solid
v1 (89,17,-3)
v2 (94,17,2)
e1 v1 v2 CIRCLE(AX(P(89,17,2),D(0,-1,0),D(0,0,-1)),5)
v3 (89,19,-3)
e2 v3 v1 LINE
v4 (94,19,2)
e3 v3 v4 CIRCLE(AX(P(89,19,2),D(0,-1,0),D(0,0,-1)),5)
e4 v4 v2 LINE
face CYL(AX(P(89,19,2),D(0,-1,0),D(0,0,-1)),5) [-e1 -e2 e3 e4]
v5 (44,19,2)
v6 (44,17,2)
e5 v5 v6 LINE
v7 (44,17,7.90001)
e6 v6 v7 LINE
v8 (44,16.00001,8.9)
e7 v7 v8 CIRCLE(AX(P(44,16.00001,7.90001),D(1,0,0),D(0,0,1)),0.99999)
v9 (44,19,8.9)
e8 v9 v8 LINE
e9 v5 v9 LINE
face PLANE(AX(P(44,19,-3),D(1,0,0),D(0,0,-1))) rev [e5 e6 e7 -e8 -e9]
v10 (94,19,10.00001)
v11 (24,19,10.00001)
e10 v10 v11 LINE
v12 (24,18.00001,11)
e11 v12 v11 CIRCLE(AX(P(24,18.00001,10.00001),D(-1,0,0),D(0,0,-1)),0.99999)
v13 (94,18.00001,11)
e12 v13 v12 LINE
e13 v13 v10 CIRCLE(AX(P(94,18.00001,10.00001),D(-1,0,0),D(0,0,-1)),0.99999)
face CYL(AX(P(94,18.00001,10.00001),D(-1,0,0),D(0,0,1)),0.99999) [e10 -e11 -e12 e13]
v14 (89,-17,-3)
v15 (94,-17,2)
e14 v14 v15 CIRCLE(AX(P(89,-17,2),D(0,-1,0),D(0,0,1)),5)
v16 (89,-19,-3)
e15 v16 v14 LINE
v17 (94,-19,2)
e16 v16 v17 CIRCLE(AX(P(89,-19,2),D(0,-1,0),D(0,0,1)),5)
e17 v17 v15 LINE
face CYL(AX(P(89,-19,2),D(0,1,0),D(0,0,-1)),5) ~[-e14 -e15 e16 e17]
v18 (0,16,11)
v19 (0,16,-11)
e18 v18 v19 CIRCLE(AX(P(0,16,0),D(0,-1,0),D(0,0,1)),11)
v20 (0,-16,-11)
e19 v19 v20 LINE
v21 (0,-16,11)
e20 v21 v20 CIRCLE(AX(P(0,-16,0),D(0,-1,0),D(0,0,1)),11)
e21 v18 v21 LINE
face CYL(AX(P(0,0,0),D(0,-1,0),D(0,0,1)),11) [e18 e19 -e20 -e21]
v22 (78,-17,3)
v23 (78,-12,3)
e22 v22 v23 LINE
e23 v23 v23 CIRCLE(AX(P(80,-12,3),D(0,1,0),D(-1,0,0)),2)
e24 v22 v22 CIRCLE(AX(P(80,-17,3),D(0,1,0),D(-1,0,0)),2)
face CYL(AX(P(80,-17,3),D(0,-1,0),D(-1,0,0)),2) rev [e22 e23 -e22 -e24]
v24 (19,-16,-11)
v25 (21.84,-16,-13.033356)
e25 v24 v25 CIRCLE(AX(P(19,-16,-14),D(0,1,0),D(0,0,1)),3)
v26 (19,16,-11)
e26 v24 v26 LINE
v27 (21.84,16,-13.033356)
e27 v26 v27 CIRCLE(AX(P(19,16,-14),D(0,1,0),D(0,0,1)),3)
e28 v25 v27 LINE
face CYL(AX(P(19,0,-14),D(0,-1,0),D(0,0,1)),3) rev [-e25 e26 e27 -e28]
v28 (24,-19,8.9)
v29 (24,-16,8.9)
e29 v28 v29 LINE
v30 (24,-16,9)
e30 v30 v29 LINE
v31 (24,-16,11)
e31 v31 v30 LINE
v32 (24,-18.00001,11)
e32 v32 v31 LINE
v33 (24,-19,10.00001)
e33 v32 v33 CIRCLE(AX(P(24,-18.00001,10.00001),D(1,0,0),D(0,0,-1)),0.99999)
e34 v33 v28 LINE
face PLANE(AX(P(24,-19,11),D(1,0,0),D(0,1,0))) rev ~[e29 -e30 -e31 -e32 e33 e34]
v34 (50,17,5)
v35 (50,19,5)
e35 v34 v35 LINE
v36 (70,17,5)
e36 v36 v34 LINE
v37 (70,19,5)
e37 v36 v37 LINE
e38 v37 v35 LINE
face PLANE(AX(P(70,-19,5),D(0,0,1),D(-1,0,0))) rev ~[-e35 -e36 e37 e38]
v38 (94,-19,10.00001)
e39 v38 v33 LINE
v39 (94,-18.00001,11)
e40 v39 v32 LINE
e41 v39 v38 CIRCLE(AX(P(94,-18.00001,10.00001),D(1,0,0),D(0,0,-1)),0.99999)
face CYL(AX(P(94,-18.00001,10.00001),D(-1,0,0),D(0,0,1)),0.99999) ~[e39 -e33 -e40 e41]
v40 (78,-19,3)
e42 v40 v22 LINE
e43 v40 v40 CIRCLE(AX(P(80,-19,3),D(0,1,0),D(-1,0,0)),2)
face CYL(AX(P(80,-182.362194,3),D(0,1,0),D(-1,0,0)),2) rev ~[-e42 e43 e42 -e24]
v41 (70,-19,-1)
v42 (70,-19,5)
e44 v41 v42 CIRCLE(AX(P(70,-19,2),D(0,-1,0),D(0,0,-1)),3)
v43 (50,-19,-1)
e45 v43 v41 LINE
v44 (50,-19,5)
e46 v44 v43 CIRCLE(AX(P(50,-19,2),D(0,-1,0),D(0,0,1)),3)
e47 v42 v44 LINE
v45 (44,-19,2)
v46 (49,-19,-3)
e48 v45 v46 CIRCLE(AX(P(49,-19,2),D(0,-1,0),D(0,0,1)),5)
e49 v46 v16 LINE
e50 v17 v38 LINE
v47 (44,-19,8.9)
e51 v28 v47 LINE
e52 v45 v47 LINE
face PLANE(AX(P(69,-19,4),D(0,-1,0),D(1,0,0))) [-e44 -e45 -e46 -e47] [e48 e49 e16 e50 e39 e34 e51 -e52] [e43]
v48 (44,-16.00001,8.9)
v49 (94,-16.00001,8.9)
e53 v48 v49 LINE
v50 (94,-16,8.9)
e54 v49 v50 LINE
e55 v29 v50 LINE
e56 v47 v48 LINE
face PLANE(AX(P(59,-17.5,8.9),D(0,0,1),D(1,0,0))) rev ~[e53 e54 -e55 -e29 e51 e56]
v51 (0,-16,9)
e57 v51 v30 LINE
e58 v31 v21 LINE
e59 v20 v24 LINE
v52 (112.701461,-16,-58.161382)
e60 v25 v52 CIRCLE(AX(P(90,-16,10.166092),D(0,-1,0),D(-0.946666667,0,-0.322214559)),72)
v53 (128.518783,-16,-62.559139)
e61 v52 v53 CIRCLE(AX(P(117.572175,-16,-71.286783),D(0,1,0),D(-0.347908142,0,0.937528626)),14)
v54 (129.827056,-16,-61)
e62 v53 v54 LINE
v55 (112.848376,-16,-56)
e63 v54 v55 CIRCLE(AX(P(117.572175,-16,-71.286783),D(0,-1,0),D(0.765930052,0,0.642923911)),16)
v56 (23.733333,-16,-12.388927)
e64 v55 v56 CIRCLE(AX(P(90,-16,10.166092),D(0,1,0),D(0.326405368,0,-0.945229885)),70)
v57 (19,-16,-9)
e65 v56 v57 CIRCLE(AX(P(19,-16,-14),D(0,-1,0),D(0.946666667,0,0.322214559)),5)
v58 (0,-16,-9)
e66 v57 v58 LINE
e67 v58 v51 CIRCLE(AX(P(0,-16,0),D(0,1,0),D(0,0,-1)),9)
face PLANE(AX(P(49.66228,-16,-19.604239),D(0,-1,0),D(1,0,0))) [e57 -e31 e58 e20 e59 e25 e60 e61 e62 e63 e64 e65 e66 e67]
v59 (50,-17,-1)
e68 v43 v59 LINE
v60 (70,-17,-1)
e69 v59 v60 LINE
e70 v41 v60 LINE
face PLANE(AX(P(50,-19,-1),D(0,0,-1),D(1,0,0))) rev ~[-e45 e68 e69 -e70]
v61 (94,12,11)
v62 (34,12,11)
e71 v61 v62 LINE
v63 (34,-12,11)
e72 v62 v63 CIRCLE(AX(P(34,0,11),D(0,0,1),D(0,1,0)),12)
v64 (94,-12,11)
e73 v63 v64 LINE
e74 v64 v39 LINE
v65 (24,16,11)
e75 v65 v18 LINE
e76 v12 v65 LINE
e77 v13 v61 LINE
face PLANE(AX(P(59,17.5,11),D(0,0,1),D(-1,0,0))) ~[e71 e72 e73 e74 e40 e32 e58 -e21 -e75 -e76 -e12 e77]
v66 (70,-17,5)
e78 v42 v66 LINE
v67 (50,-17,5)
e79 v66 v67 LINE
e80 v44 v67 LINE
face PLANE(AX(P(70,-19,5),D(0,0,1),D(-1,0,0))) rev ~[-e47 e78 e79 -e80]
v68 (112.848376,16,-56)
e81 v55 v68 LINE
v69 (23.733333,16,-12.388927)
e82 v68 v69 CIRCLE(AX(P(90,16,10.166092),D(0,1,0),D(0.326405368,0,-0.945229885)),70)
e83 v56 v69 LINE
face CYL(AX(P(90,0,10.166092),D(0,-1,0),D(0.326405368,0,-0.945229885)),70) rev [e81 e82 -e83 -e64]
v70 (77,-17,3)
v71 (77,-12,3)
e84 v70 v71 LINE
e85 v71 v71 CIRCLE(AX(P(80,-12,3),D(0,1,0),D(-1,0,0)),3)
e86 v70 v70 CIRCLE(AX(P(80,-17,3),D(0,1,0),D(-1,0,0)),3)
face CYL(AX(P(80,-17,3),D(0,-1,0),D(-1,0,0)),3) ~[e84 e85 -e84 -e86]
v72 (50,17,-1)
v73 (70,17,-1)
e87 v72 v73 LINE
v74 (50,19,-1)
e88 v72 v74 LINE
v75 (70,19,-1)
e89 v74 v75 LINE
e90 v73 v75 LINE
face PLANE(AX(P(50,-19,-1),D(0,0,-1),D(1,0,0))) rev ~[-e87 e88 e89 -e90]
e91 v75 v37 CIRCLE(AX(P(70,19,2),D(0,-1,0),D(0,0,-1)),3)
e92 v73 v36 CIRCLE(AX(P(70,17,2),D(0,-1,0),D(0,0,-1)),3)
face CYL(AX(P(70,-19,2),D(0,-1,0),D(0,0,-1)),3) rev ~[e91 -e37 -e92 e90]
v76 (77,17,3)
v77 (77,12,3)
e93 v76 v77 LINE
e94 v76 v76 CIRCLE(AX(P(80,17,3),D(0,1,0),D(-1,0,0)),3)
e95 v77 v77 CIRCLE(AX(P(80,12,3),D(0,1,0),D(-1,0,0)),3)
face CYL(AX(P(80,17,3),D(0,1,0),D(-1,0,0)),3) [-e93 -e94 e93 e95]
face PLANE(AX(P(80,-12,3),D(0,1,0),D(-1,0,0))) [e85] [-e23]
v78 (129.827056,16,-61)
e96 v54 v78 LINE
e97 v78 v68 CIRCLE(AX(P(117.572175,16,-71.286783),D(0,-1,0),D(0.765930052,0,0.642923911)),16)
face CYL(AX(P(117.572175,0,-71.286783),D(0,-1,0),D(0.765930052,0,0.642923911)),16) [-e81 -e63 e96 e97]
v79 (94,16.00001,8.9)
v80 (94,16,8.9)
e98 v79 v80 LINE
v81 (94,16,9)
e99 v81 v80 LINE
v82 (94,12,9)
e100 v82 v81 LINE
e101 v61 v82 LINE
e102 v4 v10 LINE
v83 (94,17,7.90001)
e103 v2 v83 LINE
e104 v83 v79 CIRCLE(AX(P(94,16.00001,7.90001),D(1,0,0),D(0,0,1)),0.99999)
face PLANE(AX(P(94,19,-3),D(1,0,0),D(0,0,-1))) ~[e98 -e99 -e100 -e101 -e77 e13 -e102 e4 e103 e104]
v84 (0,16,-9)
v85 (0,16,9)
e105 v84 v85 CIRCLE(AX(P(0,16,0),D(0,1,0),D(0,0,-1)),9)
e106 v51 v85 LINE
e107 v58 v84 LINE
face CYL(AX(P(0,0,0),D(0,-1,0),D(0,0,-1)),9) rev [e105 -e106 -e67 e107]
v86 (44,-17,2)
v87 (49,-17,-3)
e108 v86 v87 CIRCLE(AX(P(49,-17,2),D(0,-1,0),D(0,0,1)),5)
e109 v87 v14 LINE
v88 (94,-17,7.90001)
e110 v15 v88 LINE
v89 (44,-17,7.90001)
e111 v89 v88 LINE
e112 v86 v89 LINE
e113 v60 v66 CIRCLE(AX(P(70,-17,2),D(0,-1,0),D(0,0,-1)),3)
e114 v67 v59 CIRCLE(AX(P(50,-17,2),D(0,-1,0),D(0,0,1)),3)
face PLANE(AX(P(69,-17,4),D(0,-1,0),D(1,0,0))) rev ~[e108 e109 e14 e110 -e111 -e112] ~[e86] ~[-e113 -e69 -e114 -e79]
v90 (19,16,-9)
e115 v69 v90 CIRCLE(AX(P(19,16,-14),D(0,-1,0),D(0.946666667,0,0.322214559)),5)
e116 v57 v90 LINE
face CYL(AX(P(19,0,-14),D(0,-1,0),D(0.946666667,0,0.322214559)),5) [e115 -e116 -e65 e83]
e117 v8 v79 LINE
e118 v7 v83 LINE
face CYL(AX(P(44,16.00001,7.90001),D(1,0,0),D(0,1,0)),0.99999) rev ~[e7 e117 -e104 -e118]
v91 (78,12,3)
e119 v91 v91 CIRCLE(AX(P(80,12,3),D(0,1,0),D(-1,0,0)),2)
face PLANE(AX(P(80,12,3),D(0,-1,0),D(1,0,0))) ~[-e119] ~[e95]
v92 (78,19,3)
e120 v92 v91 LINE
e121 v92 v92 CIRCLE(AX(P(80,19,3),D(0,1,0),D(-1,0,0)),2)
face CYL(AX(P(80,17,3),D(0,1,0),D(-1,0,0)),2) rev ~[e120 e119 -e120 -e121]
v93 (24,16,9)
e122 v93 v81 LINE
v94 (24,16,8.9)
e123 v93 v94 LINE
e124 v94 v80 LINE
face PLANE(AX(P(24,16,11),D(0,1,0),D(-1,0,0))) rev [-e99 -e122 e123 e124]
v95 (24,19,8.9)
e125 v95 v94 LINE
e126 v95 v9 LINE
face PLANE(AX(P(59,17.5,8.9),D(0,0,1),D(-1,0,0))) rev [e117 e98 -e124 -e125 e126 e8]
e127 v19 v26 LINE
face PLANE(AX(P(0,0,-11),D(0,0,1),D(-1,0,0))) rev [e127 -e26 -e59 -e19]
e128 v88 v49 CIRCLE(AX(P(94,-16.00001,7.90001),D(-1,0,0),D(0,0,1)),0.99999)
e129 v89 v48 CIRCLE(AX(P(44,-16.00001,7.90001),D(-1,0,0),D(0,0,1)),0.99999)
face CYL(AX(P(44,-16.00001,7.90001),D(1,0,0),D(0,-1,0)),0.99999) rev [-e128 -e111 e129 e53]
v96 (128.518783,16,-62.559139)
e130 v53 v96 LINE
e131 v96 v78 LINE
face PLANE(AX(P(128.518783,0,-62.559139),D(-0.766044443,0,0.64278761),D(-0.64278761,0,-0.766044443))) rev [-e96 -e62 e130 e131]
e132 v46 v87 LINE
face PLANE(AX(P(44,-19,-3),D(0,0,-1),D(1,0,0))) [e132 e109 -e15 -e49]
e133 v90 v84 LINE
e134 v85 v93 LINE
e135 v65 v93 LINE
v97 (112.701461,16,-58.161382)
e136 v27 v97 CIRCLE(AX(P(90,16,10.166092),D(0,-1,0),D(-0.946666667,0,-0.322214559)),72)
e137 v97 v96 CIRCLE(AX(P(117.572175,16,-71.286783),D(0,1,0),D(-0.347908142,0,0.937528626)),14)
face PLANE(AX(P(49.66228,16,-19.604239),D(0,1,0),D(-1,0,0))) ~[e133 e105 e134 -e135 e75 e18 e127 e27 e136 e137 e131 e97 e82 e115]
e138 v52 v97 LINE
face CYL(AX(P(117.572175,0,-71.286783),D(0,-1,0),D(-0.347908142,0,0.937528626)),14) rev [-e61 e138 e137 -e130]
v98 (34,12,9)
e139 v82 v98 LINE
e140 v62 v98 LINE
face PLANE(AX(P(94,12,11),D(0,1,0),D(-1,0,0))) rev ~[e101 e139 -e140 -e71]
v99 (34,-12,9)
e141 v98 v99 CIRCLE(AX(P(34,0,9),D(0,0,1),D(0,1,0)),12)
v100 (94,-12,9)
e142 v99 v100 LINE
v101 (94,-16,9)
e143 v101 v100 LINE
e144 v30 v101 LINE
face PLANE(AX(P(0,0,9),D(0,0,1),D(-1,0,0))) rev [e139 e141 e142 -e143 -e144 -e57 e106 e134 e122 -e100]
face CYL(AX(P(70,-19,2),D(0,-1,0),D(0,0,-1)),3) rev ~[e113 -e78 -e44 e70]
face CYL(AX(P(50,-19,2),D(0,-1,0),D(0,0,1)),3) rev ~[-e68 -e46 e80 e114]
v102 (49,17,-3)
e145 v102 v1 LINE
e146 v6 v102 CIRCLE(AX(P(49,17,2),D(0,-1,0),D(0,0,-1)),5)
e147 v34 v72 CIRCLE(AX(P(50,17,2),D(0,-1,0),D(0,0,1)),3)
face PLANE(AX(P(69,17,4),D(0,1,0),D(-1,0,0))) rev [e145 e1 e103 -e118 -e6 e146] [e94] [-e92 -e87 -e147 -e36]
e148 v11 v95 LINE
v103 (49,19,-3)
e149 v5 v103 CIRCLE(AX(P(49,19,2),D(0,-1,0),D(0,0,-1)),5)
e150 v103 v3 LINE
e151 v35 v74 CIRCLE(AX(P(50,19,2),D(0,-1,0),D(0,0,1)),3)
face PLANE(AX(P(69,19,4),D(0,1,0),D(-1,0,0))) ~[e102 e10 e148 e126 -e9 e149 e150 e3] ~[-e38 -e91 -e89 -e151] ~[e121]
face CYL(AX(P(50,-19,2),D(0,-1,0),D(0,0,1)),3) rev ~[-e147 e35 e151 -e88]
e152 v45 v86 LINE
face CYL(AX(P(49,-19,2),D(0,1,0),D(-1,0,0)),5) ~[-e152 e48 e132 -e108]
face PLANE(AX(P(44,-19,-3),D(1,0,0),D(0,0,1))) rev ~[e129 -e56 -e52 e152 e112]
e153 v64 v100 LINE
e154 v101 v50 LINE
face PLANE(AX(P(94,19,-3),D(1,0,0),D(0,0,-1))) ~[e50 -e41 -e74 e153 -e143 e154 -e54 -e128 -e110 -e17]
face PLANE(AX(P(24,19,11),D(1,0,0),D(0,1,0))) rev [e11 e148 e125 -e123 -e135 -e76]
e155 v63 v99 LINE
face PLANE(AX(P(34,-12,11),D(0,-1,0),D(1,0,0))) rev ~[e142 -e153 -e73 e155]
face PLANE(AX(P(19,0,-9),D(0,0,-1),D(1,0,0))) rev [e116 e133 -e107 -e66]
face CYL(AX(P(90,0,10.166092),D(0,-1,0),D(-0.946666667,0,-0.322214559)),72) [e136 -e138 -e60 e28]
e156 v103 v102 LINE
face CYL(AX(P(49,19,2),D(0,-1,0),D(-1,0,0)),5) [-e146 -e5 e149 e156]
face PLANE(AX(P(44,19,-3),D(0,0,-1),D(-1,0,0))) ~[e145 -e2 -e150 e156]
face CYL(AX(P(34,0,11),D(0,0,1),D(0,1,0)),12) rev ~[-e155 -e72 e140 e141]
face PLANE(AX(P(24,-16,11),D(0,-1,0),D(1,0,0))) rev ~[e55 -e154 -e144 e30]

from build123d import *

# Parameters (mm, degrees)
F1_DEPTH  = 16
F2_W      = 70
F2_H      = 3
F3_DEPTH  = 2.1
F4_W      = 50
F4_H      = 14
F5_DEPTH  = 2
F6_R      = 0.99999
F9_DEPTH  = 2
F11_DEPTH = 38.001
F13_D     = 4
F14_R     = 3
F14_R_2   = 2
F15_DEPTH = 5
F16_R     = 5


# Not quite as in the source:
# - a fillet or chamfer is up to 0.001 mm smaller than in the source, because OpenCascade refuses the exact size
# - a pattern or mirror of a feature is missing from the dataset's text; its kind, count and spacing are read off the source's solid


with BuildPart() as f1:
    # F0 (on Front) → F1 (new body)
    with BuildSketch(Plane.XZ):
        with BuildLine():
            ThreePointArc((0, -9), (-9, 0), (0, 9))
            Line((0, 9), (94, 9))
            Line((94, 9), (94, 11))
            Line((94, 11), (0, 11))
            ThreePointArc((0, 11), (-11, 0), (0, -11))
            Line((0, -11), (19, -11))
            ThreePointArc((19, -11), (20.7464347921, -11.5607448848), (21.84, -13.0333563221))
            ThreePointArc((21.84, -13.0333563221), (57.9725997897, -54.3183684737), (112.7014609544, -58.1613818136))
            ThreePointArc((112.7014609544, -58.1613818136), (121.3224001133, -57.7984242203), (128.5187831367, -62.5591386181))
            Line((128.5187831367, -62.5591386181), (129.8270557762, -61))
            ThreePointArc((129.8270557762, -61), (122.0920530207, -55.9384698962), (112.8483757943, -56))
            ThreePointArc((112.8483757943, -56), (59.2303979034, -52.7086373708), (23.7333333333, -12.3889272035))
            ThreePointArc((23.7333333333, -12.3889272035), (21.9107246536, -9.9345748081), (19, -9))
            Line((19, -9), (0, -9))
        make_face()
    extrude(amount=F1_DEPTH)

    # F2 (on face) → F3 (join)
    with BuildSketch(Plane.XY.offset(11)):
        with Locations((59, -17.5)):
            Rectangle(F2_W, F2_H)
    extrude(amount=-F3_DEPTH)

    # F4 (on face) → F5 (join)
    with BuildSketch(Plane.XZ.offset(19)):
        with Locations((69, 4)):
            Rectangle(F4_W, F4_H)
    extrude(amount=-F5_DEPTH)

    # F6 (radius 1 in the source; OpenCascade refuses exactly that, so slightly less here)
    f6_edges = [f1.edges().sort_by_distance(p)[0] for p in [
        (59, -19, 11),
        (69, -17, 8.9),
    ]]
    fillet(f6_edges, radius=F6_R)

    # F7: F1 across plane


with BuildPart() as f1_1:
    add(f1.part)
    add(f1.part.mirror(Plane.XZ))

    # F8 (on face) → F9 (cut)
    with BuildSketch(Plane.XY.offset(11)):
        with BuildLine():
            Line((94, 12), (34, 12))
            ThreePointArc((34, 12), (22, 0), (34, -12))
            Line((34, -12), (94, -12))
            Line((94, -12), (94, 12))
        make_face()
    extrude(amount=-F9_DEPTH, mode=Mode.SUBTRACT)

    # F10 (on face) → F11 (cut, through all)
    with BuildSketch(Plane.XZ.offset(19)):
        with BuildLine():
            ThreePointArc((50, 5), (47, 2), (50, -1))
            Line((50, -1), (70, -1))
            ThreePointArc((70, -1), (73, 2), (70, 5))
            Line((70, 5), (50, 5))
        make_face()
    extrude(amount=-F11_DEPTH, mode=Mode.SUBTRACT)

    # F13 (through all)
    with Locations(Plane.XZ.offset(19)):
        with Locations((80, 3)):
            Hole(F13_D / 2)

    # F14 (on face) → F15 (join)
    with BuildSketch(Plane(origin=(0, -17, 0), x_dir=(-1, 0, 0), z_dir=(0, 1, 0))):
        with Locations((-80, 3)):
            Circle(F14_R)
        with Locations((-80, 3)):
            Circle(F14_R_2, mode=Mode.SUBTRACT)
    f15 = extrude(amount=F15_DEPTH)

    # F15_copies: F15 across plane
    add(f15.mirror(Plane.ZX))

    # F16
    f16_edges = [f1_1.edges().sort_by_distance(p)[0] for p in [
        (94, -18, -3),
        (94, 18, -3),
        (44, -18, -3),
        (44, 18, -3),
    ]]
    fillet(f16_edges, radius=F16_R)


solid = f1_1.part
